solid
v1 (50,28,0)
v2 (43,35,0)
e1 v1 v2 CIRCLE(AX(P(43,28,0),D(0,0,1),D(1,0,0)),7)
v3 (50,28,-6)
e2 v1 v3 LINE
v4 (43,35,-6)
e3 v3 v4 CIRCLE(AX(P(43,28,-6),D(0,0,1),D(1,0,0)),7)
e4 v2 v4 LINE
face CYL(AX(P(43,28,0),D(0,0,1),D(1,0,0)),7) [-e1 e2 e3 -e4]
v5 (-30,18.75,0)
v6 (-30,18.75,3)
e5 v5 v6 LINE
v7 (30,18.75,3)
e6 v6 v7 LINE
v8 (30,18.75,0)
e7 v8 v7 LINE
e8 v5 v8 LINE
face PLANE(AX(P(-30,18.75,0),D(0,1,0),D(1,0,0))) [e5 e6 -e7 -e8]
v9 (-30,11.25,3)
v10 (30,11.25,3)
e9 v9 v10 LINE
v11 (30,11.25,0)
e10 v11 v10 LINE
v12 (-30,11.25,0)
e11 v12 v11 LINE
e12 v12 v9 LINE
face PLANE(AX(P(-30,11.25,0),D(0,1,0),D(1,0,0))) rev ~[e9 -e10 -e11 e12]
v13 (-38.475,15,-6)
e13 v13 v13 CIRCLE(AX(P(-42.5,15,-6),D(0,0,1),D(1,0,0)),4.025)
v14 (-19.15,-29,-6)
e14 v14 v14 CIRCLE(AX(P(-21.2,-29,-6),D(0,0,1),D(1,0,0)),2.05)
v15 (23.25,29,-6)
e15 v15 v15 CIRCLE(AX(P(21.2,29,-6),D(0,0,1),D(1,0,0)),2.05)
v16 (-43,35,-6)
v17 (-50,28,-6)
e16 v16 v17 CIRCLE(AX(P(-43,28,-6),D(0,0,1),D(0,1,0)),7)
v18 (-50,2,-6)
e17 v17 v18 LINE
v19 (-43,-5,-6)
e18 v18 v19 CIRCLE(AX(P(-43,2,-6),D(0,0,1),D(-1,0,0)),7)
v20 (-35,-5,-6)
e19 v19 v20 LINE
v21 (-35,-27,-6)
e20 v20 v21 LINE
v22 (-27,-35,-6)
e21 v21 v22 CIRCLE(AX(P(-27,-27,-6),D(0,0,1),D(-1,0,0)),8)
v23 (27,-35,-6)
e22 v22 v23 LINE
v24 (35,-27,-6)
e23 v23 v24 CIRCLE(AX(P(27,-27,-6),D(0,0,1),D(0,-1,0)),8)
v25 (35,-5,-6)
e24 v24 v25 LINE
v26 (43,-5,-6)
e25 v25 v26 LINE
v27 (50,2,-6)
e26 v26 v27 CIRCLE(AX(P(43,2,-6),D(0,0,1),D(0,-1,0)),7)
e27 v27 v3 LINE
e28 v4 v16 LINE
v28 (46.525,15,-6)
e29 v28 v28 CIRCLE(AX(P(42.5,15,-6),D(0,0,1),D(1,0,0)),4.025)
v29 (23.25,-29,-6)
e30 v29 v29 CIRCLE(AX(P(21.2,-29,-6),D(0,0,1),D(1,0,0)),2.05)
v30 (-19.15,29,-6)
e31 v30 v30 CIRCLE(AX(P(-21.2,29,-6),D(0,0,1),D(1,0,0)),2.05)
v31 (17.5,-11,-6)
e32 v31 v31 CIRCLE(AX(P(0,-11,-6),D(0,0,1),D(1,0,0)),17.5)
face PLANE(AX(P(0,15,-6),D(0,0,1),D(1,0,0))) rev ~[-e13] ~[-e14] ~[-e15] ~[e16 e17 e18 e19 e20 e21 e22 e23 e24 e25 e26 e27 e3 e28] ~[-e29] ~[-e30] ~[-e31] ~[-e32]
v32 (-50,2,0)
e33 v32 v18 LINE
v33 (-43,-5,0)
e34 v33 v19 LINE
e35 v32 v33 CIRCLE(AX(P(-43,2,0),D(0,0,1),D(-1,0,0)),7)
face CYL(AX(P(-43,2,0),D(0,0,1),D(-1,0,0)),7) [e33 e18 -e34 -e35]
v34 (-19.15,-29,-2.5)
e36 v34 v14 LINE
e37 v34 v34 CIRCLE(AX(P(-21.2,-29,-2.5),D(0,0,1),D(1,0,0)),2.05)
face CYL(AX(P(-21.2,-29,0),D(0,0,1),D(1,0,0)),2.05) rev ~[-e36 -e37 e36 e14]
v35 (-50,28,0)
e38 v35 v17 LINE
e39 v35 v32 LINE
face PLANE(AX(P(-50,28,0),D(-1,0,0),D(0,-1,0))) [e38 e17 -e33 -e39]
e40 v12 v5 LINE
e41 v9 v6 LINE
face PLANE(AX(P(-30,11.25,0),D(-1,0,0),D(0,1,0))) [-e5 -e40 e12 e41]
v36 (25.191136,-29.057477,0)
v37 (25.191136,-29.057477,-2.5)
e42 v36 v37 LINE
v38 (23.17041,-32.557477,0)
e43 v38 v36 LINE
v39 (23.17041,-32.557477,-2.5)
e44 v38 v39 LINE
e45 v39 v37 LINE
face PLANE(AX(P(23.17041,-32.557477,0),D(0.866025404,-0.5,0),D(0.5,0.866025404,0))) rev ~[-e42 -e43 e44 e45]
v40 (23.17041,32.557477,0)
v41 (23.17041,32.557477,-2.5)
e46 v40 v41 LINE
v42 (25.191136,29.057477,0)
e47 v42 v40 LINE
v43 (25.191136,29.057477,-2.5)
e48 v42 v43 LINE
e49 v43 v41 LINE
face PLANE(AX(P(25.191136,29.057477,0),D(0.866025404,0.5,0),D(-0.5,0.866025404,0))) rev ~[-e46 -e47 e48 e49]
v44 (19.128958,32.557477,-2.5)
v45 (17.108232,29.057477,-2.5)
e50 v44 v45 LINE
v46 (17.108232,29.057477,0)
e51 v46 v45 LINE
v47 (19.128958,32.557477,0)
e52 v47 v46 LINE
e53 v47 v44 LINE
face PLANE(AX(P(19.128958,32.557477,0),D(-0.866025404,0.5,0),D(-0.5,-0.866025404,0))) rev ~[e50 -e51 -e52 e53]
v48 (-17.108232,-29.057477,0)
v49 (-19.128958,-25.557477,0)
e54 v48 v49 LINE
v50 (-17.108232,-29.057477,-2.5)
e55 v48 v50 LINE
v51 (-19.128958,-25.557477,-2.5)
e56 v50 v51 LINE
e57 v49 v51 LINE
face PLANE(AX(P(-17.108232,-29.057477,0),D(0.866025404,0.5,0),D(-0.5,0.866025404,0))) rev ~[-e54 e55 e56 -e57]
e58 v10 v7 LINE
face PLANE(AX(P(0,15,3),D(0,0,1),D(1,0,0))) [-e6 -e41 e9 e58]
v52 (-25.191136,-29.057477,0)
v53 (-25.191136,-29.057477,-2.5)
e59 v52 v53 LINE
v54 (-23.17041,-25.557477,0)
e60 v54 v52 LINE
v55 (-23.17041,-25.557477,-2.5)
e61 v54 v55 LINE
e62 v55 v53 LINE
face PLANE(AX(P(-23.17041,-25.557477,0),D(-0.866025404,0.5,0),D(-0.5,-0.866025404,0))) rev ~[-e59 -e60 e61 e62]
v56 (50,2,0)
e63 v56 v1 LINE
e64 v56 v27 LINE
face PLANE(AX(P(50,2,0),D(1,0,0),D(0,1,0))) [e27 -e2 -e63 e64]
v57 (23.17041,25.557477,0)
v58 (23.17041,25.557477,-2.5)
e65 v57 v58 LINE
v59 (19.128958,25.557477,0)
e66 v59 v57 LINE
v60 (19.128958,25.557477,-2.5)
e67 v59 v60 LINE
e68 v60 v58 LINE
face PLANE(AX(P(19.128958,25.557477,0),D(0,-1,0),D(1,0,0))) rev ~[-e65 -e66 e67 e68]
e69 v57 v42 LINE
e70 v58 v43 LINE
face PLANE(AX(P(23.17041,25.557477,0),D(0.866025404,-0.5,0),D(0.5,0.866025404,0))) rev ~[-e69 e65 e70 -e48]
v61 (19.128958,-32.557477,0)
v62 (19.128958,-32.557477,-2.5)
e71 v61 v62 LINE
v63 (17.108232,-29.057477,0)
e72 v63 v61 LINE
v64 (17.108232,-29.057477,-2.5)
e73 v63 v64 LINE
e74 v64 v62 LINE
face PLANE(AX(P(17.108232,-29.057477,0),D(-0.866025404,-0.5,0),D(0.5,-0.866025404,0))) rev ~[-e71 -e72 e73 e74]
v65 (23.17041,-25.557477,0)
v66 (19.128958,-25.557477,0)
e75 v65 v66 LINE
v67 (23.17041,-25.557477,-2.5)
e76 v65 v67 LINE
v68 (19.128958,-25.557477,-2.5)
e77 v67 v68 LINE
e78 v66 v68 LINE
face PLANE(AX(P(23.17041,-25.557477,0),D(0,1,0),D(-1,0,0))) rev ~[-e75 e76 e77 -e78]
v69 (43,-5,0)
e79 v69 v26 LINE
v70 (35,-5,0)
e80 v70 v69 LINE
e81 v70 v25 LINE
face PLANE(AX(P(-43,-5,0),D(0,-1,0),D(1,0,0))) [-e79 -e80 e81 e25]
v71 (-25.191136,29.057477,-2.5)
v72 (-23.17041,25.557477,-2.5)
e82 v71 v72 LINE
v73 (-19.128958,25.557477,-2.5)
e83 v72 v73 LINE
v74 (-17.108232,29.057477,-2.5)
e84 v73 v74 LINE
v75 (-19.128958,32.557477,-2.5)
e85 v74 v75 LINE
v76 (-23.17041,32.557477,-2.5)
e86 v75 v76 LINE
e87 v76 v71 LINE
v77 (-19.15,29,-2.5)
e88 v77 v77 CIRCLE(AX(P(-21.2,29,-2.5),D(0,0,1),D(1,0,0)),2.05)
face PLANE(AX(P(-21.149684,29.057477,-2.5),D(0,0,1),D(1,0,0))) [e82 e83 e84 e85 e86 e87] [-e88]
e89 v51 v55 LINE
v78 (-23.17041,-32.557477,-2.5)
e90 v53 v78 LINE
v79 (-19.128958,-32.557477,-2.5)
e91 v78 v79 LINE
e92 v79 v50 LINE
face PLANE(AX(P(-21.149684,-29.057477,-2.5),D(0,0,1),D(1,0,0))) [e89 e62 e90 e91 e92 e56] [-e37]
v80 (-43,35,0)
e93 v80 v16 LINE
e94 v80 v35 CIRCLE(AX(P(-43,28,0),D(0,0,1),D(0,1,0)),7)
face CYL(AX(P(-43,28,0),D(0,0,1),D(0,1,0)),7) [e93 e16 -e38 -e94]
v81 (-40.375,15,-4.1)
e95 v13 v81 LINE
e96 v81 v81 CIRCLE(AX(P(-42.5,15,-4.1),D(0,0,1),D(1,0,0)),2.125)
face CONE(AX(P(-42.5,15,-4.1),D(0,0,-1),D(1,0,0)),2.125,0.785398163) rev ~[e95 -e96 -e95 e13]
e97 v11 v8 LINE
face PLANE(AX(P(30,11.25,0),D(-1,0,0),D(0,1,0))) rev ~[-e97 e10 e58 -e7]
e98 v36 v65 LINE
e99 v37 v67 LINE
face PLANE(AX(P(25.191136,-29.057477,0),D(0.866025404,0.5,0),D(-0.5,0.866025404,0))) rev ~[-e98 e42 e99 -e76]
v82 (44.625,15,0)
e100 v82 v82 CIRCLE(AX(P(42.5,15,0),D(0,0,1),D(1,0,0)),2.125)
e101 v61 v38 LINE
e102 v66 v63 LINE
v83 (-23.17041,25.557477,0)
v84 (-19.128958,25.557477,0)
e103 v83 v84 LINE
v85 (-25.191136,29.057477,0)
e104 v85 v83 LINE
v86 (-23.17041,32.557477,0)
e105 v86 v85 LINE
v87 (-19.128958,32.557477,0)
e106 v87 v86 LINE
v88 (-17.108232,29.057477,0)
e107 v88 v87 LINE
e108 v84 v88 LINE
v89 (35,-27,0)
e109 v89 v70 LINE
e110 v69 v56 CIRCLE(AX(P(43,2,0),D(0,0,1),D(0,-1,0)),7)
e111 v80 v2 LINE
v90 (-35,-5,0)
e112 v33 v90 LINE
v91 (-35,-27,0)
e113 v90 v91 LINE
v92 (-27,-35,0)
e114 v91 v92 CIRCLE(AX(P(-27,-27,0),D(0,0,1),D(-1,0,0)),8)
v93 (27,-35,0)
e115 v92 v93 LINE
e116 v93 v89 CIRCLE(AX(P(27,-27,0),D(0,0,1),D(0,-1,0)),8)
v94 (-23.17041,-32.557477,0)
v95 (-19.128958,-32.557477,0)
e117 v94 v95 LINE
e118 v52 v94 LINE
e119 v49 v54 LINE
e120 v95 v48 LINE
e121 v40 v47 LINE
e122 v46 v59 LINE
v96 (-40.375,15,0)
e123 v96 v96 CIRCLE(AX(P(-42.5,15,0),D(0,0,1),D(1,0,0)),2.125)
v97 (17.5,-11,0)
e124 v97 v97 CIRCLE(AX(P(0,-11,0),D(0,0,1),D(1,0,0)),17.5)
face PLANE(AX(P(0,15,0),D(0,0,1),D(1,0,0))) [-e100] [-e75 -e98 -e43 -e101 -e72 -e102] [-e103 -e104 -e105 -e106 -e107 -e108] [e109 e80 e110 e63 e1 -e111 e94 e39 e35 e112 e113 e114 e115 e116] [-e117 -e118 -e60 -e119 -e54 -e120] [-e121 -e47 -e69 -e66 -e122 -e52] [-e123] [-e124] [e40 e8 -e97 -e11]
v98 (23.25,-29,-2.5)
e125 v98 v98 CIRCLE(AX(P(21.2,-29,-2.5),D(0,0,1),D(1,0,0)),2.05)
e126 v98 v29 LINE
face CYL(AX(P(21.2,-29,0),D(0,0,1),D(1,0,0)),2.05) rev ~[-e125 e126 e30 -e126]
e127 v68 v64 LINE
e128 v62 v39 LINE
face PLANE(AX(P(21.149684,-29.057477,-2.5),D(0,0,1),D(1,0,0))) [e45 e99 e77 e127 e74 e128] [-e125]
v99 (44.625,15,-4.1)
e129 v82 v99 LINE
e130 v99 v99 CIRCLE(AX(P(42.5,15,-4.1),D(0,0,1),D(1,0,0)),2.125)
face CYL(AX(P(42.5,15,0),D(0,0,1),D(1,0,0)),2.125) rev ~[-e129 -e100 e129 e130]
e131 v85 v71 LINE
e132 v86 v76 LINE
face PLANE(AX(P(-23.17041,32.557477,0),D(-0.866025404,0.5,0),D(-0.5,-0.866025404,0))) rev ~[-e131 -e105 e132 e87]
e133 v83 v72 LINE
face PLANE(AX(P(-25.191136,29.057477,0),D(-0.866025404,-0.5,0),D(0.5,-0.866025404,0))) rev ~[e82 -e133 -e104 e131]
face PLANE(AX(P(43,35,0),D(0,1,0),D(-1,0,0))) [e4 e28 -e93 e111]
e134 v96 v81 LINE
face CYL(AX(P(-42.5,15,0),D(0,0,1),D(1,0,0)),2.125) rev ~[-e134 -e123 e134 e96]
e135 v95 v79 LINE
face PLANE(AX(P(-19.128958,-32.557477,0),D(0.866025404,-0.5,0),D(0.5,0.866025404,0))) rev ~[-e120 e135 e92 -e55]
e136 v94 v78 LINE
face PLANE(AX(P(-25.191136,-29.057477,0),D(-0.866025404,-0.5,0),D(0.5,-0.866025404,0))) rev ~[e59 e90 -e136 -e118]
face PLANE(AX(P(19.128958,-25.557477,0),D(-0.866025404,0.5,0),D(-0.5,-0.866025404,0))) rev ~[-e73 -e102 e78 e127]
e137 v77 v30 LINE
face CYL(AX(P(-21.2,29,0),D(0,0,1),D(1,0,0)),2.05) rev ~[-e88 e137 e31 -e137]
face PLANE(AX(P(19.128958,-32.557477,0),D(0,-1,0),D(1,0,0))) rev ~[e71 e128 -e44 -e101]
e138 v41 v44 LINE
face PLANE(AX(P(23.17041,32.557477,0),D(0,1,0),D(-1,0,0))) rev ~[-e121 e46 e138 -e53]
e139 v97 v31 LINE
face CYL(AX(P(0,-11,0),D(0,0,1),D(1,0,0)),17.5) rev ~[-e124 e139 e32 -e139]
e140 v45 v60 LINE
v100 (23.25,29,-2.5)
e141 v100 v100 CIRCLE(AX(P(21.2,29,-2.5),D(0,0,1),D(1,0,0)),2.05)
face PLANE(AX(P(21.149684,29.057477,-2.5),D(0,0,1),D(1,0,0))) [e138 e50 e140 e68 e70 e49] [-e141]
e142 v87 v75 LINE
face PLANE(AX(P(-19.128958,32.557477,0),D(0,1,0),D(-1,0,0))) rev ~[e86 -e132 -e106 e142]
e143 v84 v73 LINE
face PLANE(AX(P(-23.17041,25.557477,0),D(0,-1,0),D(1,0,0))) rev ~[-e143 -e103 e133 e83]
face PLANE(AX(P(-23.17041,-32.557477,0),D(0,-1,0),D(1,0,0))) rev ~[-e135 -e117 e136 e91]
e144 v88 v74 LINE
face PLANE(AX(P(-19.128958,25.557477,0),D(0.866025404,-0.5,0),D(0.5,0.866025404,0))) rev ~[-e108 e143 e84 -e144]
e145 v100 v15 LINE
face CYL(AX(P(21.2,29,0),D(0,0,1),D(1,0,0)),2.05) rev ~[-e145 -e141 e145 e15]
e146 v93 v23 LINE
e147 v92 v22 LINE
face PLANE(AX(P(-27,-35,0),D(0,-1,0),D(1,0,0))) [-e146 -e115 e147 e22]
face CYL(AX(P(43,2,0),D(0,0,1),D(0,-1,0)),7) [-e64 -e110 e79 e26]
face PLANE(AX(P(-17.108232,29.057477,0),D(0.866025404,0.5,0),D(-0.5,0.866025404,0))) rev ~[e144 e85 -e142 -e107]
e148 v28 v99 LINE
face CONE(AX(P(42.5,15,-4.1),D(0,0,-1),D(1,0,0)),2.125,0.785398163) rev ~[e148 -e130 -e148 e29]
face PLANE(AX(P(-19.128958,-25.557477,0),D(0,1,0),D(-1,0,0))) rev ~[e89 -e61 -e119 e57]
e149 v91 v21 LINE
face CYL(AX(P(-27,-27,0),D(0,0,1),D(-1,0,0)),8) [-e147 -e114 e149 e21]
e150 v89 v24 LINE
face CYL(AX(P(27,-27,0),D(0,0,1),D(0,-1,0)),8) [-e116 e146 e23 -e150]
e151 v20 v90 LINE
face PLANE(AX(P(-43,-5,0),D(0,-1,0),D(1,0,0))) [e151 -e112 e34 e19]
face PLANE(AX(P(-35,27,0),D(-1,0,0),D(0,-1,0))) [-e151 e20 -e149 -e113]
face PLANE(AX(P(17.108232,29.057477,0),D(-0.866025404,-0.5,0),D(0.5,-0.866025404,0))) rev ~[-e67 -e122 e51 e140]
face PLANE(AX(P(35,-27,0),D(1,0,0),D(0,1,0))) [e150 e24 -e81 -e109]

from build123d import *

# Parameters (mm, degrees)
F0_R      = 2.05
F1_DEPTH  = 6
F2_R      = 2.125
F2_W      = 60
F2_H      = 7.5
F3_DEPTH  = 6
F5_DEPTH  = 2.5
F6_DEPTH  = 25
F7_SIZE   = 1.9
F8_DEPTH  = 3
F9_R      = 17.5
F10_DEPTH = 25


# Not quite as in the source:
# - a feature names something its author has since deleted; it is built from what else it names


with BuildPart() as f1:
    # F0 (on Top) → F1 (new body)
    with BuildSketch(Plane.XY):
        with BuildLine():
            ThreePointArc((35, 27), (32.6568542495, 32.6568542495), (27, 35))
            Line((27, 35), (-27, 35))
            ThreePointArc((-27, 35), (-32.6568542495, 32.6568542495), (-35, 27))
            Line((-35, 27), (-35, -27))
            ThreePointArc((-35, -27), (-32.6568542495, -32.6568542495), (-27, -35))
            Line((-27, -35), (27, -35))
            ThreePointArc((27, -35), (32.6568542495, -32.6568542495), (35, -27))
            Line((35, -27), (35, 27))
        make_face()
        with Locations((-21.2, -29)):
            Circle(F0_R, mode=Mode.SUBTRACT)
        with Locations((21.2, -29)):
            Circle(F0_R, mode=Mode.SUBTRACT)
        with Locations((-21.2, 29)):
            Circle(F0_R, mode=Mode.SUBTRACT)
        with Locations((21.2, 29)):
            Circle(F0_R, mode=Mode.SUBTRACT)
        with Locations((-21.2, 29)):
            Circle(F0_R)
        with Locations((21.2, 29)):
            Circle(F0_R)
        with Locations((21.2, -29)):
            Circle(F0_R)
        with Locations((-21.2, -29)):
            Circle(F0_R)
    extrude(amount=-F1_DEPTH)

    # F2 (on Top) → F3 (join)
    with BuildSketch(Plane.XY):
        with BuildLine():
            ThreePointArc((50, 28), (47.9497474683, 32.9497474683), (43, 35))
            Line((43, 35), (-43, 35))
            ThreePointArc((-43, 35), (-47.9497474683, 32.9497474683), (-50, 28))
            Line((-50, 28), (-50, 2))
            ThreePointArc((-50, 2), (-47.9497474683, -2.9497474683), (-43, -5))
            Line((-43, -5), (43, -5))
            ThreePointArc((43, -5), (47.9497474683, -2.9497474683), (50, 2))
            Line((50, 2), (50, 28))
        make_face()
        with Locations((-42.5, 15)):
            Circle(F2_R, mode=Mode.SUBTRACT)
        with Locations((0, 15)):
            Rectangle(F2_W, F2_H, mode=Mode.SUBTRACT)
        with Locations((42.5, 15)):
            Circle(F2_R, mode=Mode.SUBTRACT)
    extrude(amount=-F3_DEPTH)

    # F4 (on Top) → F5 (cut)
    with BuildSketch(Plane.XY):
        Polygon((19.1289578016, -32.5574766695), (23.1704096859, -32.5574766695), (25.191135628, -29.0574766695), (23.1704096859, -25.5574766695), (19.1289578016, -25.5574766695), (17.1082318594, -29.0574766695), align=None)
        Polygon((-17.1082318594, -29.0574766695), (-19.1289578016, -25.5574766695), (-23.1704096859, -25.5574766695), (-25.191135628, -29.0574766695), (-23.1704096859, -32.5574766695), (-19.1289578016, -32.5574766695), align=None)
        Polygon((-23.1704096859, 25.5574766695), (-19.1289578016, 25.5574766695), (-17.1082318594, 29.0574766695), (-19.1289578016, 32.5574766695), (-23.1704096859, 32.5574766695), (-25.191135628, 29.0574766695), align=None)
        Polygon((19.1289578016, 32.5574766695), (17.1082318594, 29.0574766695), (19.1289578016, 25.5574766695), (23.1704096859, 25.5574766695), (25.191135628, 29.0574766695), (23.1704096859, 32.5574766695), align=None)
    extrude(amount=-F5_DEPTH, mode=Mode.SUBTRACT)

    # F0 (on Top) → F6 (cut)
    with BuildSketch(Plane.XY):
        with Locations((-21.2, 29)):
            Circle(F0_R)
        with Locations((21.2, 29)):
            Circle(F0_R)
        with Locations((21.2, -29)):
            Circle(F0_R)
        with Locations((-21.2, -29)):
            Circle(F0_R)
    extrude(amount=-F6_DEPTH, mode=Mode.SUBTRACT)

    # F7
    f7_edges = [f1.edges().sort_by_distance(p)[0] for p in [
        (40.375, 15, -6),
        (-44.625, 15, -6),
    ]]
    chamfer(f7_edges, length=F7_SIZE)

    # F2 (on Top) → F8 (join)
    with BuildSketch(Plane.XY):
        with Locations((0, 15)):
            Rectangle(F2_W, F2_H)
    extrude(amount=F8_DEPTH)

    # F9 (on Top) → F10 (cut)
    with BuildSketch(Plane.XY):
        with Locations((0, -11)):
            Circle(F9_R)
    extrude(amount=-F10_DEPTH, mode=Mode.SUBTRACT)


solid = f1.part
